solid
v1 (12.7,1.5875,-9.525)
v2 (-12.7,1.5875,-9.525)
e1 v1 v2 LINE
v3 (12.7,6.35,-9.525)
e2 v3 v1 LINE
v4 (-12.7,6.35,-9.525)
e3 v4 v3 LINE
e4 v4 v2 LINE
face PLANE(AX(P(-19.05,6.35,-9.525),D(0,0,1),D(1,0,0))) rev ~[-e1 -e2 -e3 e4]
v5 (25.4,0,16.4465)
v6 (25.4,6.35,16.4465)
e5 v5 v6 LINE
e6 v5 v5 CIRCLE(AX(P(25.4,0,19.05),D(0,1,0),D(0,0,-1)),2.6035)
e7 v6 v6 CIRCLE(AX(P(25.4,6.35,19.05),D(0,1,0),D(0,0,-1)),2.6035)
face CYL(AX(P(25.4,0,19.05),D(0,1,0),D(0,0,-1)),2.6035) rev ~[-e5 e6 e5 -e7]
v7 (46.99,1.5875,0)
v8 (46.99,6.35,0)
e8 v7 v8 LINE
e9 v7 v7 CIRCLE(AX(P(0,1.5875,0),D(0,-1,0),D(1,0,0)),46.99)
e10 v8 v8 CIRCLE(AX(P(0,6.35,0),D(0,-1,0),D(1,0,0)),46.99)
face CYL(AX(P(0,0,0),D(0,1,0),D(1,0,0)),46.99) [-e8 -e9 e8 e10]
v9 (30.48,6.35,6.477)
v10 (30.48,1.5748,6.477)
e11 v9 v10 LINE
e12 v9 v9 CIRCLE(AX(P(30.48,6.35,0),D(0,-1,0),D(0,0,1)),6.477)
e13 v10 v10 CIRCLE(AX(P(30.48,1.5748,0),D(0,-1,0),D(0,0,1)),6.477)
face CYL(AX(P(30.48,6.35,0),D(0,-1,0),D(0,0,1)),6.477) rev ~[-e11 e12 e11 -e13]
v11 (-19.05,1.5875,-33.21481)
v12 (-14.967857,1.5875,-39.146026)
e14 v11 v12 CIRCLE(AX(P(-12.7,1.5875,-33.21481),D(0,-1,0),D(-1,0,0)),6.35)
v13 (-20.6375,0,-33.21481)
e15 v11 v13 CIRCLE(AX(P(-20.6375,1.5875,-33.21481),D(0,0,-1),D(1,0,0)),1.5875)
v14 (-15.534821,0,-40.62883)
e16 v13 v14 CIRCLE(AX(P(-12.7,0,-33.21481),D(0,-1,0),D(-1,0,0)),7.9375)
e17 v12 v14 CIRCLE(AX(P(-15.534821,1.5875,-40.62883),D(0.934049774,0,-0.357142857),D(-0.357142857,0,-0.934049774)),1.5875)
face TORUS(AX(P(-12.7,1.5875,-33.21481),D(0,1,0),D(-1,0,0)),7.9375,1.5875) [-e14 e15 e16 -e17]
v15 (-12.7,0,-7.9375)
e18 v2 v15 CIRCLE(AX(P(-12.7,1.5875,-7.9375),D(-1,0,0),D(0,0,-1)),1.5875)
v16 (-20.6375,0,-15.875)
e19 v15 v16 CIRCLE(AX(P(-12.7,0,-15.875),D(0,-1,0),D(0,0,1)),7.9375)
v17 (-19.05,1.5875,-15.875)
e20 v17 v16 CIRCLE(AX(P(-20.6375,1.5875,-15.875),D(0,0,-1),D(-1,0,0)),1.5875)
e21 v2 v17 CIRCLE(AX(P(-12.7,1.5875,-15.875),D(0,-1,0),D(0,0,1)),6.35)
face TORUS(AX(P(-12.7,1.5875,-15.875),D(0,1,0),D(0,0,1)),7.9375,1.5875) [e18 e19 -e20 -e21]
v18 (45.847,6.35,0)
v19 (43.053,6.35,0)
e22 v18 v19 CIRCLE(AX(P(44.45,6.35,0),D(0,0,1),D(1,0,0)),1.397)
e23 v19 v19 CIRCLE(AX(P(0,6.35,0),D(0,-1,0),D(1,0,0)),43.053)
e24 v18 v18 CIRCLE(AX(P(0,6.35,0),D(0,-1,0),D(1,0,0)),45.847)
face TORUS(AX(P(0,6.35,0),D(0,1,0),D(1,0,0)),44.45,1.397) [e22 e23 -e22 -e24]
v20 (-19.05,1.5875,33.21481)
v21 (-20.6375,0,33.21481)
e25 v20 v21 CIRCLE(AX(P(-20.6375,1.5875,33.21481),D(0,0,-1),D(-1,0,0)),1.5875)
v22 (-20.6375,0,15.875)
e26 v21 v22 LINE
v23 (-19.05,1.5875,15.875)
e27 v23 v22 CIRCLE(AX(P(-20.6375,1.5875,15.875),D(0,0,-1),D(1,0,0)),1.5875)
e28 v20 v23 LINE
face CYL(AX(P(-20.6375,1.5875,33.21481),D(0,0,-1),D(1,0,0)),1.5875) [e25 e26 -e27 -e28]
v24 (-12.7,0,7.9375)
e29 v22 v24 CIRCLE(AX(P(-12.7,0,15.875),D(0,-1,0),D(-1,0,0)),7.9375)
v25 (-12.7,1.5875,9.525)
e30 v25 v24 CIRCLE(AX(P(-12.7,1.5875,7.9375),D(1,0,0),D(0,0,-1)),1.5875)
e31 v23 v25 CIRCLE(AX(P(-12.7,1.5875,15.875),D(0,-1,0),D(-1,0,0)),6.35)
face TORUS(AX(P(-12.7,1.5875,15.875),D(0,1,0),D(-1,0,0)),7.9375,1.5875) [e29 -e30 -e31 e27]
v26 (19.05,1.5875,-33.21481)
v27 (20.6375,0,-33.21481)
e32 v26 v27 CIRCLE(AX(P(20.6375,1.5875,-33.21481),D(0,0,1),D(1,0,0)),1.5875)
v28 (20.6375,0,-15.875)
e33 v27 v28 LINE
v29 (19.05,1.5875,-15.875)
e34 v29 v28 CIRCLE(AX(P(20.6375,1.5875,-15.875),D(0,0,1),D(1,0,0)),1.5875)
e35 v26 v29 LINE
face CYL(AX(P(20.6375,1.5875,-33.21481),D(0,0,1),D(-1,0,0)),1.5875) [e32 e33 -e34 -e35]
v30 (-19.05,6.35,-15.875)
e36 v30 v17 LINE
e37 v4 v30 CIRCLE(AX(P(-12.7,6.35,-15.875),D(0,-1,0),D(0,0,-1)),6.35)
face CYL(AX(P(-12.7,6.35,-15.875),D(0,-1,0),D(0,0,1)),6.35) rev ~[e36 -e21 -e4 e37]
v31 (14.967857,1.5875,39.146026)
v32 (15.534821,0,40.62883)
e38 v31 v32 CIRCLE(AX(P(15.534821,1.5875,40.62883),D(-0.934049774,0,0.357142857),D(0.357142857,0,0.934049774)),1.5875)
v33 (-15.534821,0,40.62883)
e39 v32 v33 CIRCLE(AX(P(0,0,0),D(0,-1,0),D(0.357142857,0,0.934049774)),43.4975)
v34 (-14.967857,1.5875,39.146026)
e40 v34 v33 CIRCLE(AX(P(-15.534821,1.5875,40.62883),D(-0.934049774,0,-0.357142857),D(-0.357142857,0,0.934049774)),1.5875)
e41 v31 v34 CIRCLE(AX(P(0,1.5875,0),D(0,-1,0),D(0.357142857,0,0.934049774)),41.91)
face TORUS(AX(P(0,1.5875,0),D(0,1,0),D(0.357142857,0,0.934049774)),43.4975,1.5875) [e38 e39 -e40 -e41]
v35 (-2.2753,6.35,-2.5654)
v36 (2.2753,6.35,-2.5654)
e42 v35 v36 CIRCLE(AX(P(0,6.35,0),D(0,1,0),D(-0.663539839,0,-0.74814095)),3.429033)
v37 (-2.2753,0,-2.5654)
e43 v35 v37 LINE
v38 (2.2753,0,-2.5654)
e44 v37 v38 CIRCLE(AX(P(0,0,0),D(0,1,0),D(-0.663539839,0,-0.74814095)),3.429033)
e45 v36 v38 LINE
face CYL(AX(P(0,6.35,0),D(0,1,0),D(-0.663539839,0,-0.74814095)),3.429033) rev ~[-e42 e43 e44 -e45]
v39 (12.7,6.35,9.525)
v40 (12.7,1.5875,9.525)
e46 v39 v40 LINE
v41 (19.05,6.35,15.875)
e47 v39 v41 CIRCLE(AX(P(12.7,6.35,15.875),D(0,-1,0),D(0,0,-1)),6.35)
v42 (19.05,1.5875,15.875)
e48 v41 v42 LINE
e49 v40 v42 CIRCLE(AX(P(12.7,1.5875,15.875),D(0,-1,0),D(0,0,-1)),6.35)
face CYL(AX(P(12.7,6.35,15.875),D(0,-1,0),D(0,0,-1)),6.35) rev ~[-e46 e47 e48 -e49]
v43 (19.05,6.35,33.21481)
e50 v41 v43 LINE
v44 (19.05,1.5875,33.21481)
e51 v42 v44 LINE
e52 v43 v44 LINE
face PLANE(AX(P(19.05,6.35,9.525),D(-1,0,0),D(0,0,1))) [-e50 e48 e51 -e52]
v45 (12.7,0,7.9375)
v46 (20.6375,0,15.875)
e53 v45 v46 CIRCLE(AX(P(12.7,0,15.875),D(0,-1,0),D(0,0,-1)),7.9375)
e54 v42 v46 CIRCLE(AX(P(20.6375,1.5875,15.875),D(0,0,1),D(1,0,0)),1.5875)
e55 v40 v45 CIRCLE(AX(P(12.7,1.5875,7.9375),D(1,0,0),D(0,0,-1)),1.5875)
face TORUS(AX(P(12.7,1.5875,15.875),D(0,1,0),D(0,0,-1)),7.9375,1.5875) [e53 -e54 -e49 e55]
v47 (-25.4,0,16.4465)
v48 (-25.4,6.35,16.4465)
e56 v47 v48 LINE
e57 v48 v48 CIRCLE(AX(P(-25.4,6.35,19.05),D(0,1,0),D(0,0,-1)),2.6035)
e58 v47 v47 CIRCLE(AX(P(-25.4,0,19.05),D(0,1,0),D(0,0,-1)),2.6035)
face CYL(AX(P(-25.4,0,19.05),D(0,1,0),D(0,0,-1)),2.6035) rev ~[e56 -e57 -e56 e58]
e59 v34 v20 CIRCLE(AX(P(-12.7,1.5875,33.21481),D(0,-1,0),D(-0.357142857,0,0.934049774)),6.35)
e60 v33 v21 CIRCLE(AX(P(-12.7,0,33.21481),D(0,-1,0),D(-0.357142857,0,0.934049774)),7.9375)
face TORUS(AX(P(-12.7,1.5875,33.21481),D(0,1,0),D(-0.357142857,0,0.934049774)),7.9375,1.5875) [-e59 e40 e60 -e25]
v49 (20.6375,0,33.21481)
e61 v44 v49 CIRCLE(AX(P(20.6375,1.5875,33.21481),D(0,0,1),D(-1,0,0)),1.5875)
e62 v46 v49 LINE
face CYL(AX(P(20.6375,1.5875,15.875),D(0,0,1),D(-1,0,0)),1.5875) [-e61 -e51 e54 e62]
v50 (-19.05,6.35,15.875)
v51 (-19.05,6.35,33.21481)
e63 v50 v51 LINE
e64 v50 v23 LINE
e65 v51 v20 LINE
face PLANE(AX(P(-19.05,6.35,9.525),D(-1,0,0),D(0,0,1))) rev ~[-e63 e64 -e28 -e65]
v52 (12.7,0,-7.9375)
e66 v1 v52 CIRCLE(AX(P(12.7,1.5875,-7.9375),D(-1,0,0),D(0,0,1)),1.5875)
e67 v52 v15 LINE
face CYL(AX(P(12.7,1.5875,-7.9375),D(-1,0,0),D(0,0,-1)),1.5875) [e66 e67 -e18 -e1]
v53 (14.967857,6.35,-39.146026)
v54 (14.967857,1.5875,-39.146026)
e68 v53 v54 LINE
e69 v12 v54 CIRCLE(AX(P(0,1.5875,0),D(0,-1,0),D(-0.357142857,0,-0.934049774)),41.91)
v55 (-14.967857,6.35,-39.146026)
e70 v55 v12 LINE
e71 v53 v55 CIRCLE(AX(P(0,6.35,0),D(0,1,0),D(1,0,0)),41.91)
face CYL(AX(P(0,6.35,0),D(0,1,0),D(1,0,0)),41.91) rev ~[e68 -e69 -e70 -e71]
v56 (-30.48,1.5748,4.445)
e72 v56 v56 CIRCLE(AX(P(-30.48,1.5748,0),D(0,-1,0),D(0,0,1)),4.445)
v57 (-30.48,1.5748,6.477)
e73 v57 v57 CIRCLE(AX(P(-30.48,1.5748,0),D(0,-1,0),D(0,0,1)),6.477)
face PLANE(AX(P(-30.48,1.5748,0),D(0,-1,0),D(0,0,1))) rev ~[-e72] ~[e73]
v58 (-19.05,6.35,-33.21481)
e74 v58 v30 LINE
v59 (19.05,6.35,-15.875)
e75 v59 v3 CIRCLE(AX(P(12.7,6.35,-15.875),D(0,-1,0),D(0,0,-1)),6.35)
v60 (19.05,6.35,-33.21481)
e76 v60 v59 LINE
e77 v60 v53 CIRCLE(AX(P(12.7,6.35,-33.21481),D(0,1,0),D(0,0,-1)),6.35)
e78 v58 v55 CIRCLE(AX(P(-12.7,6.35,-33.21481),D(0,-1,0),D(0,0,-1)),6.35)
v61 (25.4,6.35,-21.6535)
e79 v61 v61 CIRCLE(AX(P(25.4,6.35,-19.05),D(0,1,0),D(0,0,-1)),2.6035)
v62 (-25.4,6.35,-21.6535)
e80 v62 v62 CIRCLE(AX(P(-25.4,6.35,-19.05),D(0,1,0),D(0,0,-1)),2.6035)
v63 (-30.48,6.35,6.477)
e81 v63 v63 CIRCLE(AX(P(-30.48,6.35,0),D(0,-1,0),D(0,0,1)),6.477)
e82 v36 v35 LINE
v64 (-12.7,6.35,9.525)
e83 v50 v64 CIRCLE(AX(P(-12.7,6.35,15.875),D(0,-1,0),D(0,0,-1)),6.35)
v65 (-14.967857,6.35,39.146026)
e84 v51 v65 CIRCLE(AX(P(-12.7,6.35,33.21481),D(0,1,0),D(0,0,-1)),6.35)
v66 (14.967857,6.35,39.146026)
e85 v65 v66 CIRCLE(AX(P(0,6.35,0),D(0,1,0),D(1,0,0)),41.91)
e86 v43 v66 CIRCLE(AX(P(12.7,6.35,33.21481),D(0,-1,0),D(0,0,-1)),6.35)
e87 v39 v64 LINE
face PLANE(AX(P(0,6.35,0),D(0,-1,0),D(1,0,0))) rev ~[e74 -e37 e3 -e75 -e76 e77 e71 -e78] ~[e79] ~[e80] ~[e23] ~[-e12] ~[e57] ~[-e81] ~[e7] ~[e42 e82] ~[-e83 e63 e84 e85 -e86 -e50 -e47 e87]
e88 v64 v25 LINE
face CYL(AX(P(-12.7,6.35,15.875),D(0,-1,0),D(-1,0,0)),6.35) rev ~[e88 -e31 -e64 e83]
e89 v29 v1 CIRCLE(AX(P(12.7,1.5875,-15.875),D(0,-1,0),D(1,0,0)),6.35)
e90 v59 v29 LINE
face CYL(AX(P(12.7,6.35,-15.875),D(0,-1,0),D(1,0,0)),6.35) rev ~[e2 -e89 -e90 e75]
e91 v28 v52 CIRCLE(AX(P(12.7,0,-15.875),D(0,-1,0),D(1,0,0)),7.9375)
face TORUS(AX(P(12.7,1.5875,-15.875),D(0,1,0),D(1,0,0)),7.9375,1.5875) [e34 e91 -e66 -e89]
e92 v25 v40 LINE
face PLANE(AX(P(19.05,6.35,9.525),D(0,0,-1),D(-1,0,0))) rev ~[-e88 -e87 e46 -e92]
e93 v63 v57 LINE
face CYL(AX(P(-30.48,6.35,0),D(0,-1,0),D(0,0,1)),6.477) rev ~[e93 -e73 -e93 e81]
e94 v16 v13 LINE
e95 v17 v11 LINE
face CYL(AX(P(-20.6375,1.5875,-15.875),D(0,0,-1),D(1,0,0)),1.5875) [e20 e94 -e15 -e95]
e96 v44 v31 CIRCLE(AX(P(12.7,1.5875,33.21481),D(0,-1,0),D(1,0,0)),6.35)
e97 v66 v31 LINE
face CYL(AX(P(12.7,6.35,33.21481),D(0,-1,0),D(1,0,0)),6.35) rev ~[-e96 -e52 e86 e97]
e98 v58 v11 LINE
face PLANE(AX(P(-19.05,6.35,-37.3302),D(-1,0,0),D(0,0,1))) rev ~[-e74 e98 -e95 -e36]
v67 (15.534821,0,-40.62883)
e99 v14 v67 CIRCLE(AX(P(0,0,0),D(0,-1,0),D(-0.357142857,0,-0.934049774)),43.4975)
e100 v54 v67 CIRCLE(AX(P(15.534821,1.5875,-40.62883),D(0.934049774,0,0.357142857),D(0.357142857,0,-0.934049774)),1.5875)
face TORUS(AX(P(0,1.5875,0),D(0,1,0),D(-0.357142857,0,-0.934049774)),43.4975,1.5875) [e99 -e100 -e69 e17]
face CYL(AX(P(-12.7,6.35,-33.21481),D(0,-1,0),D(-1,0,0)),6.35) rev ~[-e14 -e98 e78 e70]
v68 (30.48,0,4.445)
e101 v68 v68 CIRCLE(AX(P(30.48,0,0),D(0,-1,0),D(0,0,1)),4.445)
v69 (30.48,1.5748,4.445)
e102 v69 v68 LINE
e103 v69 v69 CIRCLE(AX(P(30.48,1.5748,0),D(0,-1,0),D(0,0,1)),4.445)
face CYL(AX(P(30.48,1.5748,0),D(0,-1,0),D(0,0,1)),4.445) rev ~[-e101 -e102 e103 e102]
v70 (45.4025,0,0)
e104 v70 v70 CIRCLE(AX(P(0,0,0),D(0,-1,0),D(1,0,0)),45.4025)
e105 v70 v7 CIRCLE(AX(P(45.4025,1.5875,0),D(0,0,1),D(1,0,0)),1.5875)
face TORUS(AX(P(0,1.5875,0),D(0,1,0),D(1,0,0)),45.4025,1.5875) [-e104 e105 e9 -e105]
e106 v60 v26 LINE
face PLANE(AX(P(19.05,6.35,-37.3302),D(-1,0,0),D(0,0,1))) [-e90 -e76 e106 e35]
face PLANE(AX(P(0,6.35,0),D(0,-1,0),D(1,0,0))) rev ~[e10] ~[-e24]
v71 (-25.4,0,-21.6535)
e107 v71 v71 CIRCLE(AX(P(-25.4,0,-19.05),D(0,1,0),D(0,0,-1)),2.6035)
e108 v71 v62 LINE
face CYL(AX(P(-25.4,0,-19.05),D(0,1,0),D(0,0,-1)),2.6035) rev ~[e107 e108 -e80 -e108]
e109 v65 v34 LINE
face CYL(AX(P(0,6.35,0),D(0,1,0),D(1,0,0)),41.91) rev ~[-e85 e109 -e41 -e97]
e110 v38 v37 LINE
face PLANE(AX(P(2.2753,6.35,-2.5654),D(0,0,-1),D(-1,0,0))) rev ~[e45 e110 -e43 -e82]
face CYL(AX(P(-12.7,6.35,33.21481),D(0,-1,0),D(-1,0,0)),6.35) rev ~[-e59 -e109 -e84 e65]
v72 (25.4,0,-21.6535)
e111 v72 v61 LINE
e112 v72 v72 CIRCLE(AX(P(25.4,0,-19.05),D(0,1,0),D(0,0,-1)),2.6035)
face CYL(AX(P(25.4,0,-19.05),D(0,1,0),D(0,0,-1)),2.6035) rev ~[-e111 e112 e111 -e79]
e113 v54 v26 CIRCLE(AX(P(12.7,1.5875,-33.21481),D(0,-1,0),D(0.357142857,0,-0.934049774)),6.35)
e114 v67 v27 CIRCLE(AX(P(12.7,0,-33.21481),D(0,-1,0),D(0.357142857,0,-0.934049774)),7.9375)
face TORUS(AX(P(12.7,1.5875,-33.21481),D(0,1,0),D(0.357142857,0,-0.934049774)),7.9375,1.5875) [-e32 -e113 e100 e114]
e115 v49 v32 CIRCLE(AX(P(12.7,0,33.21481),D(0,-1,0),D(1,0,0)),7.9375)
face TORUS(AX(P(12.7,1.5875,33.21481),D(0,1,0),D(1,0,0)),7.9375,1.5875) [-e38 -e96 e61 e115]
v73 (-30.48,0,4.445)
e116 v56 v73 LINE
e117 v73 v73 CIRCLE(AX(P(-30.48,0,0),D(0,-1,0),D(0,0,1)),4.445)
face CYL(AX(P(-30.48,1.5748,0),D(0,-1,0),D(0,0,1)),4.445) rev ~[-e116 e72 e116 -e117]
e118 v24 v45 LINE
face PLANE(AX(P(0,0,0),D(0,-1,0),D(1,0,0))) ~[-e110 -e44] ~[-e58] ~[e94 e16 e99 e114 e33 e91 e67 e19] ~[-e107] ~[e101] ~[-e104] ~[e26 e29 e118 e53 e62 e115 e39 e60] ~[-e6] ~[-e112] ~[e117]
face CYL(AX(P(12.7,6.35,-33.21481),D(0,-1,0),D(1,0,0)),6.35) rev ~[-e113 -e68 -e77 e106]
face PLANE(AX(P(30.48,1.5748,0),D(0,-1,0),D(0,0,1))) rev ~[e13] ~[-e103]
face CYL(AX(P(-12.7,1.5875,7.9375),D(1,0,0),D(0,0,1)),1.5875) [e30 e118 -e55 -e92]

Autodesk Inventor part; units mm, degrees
ref_plane "YZ Plane" through (0, 0, 0) normal (1, 0, 0) x (0, 1, 0)
ref_plane "XZ Plane" through (0, 0, 0) normal (0, 1, 0) x (-1, 0, 0)
ref_plane "XY Plane" through (0, 0, 0) normal (0, 0, 1) x (1, 0, 0)
sketch "Sketch1" plane through (0, 0, 0) normal (0, 0, 1) x (1, 0, 0)
  line L0 (0, 0) -> (46.99, 0)
  line L1 (46.99, 0) -> (46.99, 6.35)
  line L2 (46.99, 6.35) -> (0, 6.35)
  line L3 (0, 6.35) -> (0, 0)
  circle A0 centre (44.45, 6.35) radius 1.397
  point P0 (45.847, 6.35)
  point P1 (43.053, 6.35)
  dimension "d0" = 46.99
  dimension "d1" = 6.35
  dimension "d2" = 44.45
  dimension "d3" = 2.794
revolve "Revolution1" add sketch "Sketch1" angle 360 about axis through (0, 6.35, 0) along (0, -1, 0)
sketch "Sketch4" plane through (0, 6.35, 0) normal (0, 1, 0) x (1, 0, 0)
  circle A0 centre (0, 0) radius 30.48 construction
  line L0 (-30.48, 0) -> (30.48, 0) construction
  dimension "d24" = 60.96
hole "Hole2" at (-30.48, 6.35, 0) at (30.48, 6.35, 0) direction (0, -1, 0) diameter 8.89 end through all counterbore diameter 12.954 counterbore depth 4.7752
sketch "Sketch5" plane through (0, 6.35, 0) normal (0, 1, 0) x (1, 0, 0)
  arc A0 (-2.1767, 2.3114) -> (2.1767, 2.3114) centre (0, 0) ccw
  line L0 (-2.1767, 2.3114) -> (2.1767, 2.3114)
  line L1 (2.2753, 2.5654) -> (-2.2753, 2.5654)
  arc A1 (-2.2753, 2.5654) -> (2.2753, 2.5654) centre (0, 0) ccw
  arc A2 (2.2753, 2.5654) -> (-2.2753, 2.5654) centre (0, 0) ccw
  dimension "d32" = 6.35
  dimension "d33" = 5.4864
  dimension "d44" = 0.254
extrude "Extrusion2" cut sketch "Sketch5" against normal through all contours L0 A0 | A1 L1
sketch "Sketch6" plane through (0, 6.35, 0) normal (0, 1, 0) x (1, 0, 0)
  circle A0 centre (0, 0) radius 41.91
  line L0 (-19.05, 37.3302) -> (-19.05, -37.3302)
  line L1 (19.05, 37.3302) -> (19.05, -37.3302)
  line L2 (-40.8133, 9.525) -> (40.8133, 9.525)
  line L3 (40.8133, -9.525) -> (-40.8133, -9.525)
  point P0 (19.05, -9.525)
  point P1 (-19.05, -9.525)
  point P2 (-19.05, 9.525)
  point P3 (19.05, 9.525)
  dimension "d36" = 83.82
  dimension "d37" = 38.1
  dimension "d38" = 19.05
extrude "Extrusion3" cut sketch "Sketch6" against normal blind 25.4 contours L1 L2 L0 A0 | A0 L0 L3 L1
fillet "Fillet1" radius 6.35 8 edges at (-19.05, 3.175, -37.3302) (-19.05, 3.175, 37.3302) (19.05, 3.175, -37.3302) (19.05, 3.175, 37.3302) (-19.05, 3.175, 9.525) (19.05, 3.175, 9.525) (-19.05, 3.175, -9.525) (19.05, 3.175, -9.525)
fillet "Fillet2" radius 1.5875 17 edges at (-46.99, 0, 0) (17.1901, 0, -11.3849) (17.9308, 0, -36.8149) (17.1901, 0, 11.3849) (17.9308, 0, 36.8149) (19.05, 0, -24.5449) (19.05, 0, 24.5449) (0, 0, -41.91) (0, 0, 41.91) (-17.9308, 0, -36.8149) (-17.9308, 0, 36.8149) (-19.05, 0, -24.5449) (-19.05, 0, 24.5449) (-17.1901, 0, -11.3849) (-17.1901, 0, 11.3849) (0, 0, -9.525) (0, 0, 9.525)
sketch "Sketch8" plane through (0, 0, 0) normal (0, -1, 0) x (1, 0, 0)
  line L0 (25.4, -19.05) -> (-25.4, -19.05) construction
  line L1 (-25.4, -19.05) -> (-25.4, 19.05) construction
  line L2 (-25.4, 19.05) -> (25.4, 19.05) construction
  line L3 (25.4, 19.05) -> (25.4, -19.05) construction
  line L4 (25.4, -19.05) -> (-25.4, 19.05) construction
  line L5 (25.4, 19.05) -> (-25.4, -19.05) construction
  point P0 (0, 0)
  point P1 (0, 0)
  dimension "d53" = 50.8
  dimension "d54" = 38.1
hole "Hole3" at (25.4, 0, -19.05) at (-25.4, 0, -19.05) at (-25.4, 0, 19.05) at (25.4, 0, 19.05) direction (0, 1, 0) diameter 5.207 depth 25.4
properties part number "CarriageCap" material "ABS Plastic"
